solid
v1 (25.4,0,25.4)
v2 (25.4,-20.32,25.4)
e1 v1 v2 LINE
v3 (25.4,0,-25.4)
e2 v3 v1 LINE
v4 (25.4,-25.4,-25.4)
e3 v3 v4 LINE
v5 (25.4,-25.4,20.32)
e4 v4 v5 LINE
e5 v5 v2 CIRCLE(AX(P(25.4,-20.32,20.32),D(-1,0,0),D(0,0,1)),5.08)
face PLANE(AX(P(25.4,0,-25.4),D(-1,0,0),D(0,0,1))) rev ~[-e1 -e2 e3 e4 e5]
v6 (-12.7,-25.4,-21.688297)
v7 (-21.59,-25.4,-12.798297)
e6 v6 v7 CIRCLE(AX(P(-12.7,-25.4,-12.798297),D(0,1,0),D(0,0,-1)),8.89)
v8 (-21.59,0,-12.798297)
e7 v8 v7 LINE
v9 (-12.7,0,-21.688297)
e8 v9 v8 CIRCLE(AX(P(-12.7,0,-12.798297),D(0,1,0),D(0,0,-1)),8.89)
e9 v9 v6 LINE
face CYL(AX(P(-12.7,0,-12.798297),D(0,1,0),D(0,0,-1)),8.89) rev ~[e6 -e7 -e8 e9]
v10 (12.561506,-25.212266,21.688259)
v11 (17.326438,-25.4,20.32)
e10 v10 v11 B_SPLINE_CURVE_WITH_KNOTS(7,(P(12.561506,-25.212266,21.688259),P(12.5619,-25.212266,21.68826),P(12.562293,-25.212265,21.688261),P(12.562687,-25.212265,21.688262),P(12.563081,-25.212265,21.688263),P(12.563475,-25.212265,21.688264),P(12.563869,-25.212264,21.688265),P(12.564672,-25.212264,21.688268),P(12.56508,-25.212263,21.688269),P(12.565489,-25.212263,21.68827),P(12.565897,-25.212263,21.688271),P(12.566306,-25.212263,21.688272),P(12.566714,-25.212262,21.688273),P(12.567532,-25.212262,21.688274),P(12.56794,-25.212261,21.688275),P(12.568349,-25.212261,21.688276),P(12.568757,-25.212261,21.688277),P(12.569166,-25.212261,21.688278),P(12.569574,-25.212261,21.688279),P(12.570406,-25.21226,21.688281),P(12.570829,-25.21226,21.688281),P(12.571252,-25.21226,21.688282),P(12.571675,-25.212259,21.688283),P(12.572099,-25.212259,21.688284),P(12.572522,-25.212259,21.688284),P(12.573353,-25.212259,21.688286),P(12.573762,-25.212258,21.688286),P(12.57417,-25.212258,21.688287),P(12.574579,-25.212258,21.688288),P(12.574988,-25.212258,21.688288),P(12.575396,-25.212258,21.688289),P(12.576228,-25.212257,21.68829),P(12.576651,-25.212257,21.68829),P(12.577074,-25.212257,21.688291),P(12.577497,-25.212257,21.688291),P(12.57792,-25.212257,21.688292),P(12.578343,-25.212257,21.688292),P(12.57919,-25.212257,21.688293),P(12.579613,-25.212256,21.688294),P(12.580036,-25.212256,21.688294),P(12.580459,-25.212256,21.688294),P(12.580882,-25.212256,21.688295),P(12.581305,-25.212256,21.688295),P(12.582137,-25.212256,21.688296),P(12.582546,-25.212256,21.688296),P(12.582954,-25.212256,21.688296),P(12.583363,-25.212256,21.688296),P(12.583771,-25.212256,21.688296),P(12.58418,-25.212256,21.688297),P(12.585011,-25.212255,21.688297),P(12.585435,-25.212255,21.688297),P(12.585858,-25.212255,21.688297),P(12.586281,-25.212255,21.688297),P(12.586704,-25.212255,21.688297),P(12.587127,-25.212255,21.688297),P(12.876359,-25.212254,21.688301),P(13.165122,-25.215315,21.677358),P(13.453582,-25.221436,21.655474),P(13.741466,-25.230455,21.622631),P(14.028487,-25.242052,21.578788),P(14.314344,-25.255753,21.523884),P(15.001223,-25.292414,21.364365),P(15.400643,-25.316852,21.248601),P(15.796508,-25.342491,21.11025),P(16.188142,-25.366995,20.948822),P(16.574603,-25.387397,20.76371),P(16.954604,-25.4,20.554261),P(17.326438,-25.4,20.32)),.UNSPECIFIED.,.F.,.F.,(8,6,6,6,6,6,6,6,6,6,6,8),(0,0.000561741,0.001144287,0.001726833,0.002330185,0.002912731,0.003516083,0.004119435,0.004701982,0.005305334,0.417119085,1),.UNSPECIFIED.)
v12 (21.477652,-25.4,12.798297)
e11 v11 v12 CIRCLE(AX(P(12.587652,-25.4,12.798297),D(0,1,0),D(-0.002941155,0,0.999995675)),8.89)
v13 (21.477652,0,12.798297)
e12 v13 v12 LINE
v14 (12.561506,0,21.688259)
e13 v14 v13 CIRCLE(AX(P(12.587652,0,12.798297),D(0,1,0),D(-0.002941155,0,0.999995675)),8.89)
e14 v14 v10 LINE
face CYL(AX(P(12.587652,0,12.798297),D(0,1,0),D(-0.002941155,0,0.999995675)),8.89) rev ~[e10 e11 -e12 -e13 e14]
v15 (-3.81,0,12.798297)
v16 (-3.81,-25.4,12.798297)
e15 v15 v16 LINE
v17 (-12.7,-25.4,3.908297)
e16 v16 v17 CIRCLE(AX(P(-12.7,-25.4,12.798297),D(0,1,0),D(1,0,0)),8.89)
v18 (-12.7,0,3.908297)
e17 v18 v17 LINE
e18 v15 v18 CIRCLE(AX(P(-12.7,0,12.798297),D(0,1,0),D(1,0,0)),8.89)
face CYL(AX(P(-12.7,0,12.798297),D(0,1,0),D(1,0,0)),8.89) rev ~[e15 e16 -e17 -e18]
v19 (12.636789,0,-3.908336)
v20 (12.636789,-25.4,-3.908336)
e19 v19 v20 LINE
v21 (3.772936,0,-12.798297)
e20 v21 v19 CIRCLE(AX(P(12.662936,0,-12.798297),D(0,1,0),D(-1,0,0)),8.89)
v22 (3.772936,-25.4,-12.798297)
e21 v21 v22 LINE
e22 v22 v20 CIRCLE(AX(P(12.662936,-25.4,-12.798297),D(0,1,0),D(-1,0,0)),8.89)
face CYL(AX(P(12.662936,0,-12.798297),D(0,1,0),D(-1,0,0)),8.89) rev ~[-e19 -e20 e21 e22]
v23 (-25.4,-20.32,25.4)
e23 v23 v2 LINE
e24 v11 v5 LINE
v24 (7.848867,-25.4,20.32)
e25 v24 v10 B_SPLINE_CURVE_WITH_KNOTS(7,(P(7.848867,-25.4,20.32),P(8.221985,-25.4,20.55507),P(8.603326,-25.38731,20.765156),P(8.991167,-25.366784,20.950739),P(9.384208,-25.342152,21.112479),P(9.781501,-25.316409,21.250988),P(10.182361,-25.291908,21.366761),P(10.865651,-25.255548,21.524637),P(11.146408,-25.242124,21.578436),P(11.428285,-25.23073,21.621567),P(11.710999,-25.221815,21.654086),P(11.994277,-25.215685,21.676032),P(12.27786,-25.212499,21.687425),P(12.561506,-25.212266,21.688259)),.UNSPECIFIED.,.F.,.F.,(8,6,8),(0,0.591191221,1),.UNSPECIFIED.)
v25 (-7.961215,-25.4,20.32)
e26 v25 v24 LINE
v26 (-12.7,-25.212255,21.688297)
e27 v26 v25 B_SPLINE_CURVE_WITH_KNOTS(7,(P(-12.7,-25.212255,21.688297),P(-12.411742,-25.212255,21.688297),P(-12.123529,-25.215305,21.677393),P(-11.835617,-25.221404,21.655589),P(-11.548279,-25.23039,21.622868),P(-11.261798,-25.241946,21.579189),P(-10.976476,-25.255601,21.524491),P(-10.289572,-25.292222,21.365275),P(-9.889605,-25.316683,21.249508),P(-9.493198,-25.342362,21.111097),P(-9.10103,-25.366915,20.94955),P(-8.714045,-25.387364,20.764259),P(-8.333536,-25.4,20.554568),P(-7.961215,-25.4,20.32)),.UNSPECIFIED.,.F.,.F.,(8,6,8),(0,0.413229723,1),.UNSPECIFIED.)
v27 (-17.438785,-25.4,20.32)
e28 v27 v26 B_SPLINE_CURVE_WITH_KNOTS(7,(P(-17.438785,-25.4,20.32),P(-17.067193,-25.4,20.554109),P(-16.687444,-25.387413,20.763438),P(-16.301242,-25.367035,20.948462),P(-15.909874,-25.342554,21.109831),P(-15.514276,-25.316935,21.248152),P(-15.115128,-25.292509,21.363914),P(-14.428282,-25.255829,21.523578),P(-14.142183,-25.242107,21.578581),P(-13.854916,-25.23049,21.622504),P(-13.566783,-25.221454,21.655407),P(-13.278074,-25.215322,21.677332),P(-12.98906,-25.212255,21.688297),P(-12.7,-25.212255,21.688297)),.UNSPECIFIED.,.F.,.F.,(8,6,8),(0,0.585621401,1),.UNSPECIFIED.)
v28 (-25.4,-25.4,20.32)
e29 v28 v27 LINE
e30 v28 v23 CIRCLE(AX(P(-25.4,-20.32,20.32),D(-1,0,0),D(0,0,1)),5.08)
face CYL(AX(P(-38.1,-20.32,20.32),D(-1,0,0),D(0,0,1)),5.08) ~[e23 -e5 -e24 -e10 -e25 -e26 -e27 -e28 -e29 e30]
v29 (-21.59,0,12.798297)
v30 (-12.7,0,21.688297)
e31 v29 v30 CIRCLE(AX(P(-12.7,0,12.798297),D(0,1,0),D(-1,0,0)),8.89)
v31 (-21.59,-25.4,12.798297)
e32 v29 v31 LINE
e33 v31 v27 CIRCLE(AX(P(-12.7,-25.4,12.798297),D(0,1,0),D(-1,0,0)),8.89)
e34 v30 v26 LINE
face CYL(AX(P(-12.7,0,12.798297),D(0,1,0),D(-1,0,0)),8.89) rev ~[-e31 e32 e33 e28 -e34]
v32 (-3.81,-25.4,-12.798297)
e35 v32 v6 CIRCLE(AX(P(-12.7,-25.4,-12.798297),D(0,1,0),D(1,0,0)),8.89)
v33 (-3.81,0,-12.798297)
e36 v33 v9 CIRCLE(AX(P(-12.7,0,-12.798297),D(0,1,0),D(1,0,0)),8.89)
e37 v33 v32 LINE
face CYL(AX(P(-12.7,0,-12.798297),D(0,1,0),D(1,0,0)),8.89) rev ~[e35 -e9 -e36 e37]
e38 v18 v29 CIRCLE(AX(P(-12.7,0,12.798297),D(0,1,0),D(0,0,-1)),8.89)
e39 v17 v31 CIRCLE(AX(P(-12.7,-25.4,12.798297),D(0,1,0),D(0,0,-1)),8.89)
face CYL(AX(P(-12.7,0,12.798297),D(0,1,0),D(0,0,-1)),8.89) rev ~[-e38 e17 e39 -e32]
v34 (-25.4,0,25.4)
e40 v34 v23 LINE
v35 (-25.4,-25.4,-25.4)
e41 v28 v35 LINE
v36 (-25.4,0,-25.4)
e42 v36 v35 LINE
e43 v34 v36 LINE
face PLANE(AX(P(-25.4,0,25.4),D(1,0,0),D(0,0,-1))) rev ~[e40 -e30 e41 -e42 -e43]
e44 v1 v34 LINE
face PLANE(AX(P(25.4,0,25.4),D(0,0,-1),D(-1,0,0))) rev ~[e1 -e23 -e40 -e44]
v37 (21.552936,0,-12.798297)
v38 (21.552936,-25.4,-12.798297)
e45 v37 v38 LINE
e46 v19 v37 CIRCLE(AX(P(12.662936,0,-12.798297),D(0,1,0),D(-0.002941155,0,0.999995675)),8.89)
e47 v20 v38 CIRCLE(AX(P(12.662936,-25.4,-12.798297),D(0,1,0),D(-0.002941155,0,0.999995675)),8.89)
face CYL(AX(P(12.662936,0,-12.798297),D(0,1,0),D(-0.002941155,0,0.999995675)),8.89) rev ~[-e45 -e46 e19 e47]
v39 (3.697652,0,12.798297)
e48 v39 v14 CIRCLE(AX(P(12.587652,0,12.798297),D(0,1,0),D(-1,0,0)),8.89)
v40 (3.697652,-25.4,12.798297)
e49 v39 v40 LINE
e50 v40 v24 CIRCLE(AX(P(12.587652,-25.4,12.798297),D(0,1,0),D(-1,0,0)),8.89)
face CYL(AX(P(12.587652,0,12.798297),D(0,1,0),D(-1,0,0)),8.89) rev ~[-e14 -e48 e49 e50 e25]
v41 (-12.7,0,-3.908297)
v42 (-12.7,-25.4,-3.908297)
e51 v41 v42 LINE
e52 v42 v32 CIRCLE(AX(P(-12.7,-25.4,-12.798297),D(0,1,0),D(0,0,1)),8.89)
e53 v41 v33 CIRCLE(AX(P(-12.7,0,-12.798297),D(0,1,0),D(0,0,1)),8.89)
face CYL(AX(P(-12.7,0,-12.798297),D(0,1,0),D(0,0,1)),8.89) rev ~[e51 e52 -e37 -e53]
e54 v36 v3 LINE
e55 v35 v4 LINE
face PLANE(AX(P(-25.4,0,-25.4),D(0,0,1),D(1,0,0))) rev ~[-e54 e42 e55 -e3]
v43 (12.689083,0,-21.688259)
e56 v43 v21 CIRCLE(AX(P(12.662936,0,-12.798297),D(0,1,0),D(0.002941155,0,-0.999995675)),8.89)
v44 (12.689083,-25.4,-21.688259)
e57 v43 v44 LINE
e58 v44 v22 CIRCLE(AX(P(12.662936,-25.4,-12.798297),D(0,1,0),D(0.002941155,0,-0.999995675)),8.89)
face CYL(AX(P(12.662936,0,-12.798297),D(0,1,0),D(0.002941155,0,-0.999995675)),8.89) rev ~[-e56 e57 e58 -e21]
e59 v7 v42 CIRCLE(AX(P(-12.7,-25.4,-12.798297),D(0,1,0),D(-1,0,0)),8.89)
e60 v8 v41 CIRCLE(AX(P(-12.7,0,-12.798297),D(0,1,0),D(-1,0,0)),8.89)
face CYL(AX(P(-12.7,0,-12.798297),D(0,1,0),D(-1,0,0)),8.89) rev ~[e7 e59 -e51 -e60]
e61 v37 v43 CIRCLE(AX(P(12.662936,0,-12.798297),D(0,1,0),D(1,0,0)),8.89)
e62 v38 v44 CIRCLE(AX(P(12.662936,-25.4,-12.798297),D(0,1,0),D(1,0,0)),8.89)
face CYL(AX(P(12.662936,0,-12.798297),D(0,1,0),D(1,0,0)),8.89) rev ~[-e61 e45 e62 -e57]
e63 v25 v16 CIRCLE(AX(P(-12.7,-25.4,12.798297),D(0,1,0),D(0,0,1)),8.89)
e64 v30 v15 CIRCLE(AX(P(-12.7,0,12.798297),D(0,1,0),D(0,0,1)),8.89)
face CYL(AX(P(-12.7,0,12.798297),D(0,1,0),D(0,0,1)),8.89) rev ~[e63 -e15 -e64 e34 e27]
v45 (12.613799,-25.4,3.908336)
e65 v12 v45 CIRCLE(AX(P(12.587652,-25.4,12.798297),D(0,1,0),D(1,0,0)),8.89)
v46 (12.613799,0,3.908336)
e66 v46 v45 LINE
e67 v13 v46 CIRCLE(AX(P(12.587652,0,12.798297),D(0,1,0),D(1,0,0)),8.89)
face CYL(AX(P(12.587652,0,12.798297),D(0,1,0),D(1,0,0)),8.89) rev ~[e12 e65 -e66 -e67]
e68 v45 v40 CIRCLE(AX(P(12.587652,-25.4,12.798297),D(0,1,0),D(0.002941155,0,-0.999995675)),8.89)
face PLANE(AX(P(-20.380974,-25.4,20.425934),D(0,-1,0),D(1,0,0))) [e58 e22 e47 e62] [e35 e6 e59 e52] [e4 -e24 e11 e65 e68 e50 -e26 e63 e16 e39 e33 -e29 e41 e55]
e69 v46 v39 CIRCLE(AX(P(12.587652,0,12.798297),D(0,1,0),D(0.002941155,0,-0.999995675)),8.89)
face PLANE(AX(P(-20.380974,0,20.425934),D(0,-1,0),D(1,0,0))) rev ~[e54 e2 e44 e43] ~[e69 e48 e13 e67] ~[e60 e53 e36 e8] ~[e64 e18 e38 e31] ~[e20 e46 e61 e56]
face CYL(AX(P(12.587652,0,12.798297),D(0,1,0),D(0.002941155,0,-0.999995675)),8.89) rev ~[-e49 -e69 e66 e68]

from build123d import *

# Parameters (mm, degrees)
F1_DEPTH    = 25.4
F2_T1_DEPTH = 76.2


# Not quite as in the source:
# - a fillet or chamfer that OpenCascade refuses, or shapes differently, is made with other operations: its cross-section is extruded or revolved along the edge and cut away or added


with BuildPart() as f1:
    # F0 (on Front) → F1 (new body)
    with BuildSketch(Plane.XZ):
        with BuildLine():
            Line((-12.7, 25.4), (-25.4, 25.4))
            Line((-25.4, 25.4), (-25.4, 12.798297219))
            Line((-25.4, 12.798297219), (-21.59, 12.798297219))
            ThreePointArc((-21.59, 12.798297219), (-18.9861792847, 19.0844765037), (-12.7, 21.688297219))
            Line((-12.7, 21.688297219), (-12.7, 25.4))
        make_face()
        with BuildLine():
            Line((0, 25.4), (-12.7, 25.4))
            Line((-12.7, 25.4), (-12.7, 21.688297219))
            ThreePointArc((-12.7, 21.688297219), (-6.4138207153, 19.0844765037), (-3.81, 12.798297219))
            Line((-3.81, 12.798297219), (0, 12.798297219))
            Line((0, 12.798297219), (0, 25.4))
        make_face()
        with BuildLine():
            Line((-21.59, 12.798297219), (-25.4, 12.798297219))
            Line((-25.4, 12.798297219), (-25.4, 0))
            Line((-25.4, 0), (-12.7, 0))
            Line((-12.7, 0), (-12.7, 3.908297219))
            ThreePointArc((-12.7, 3.908297219), (-18.9861792847, 6.5121179342), (-21.59, 12.798297219))
        make_face()
        with BuildLine():
            Line((12.5505886972, 25.4), (0, 25.4))
            Line((0, 25.4), (0, 12.798297219))
            Line((0, 12.798297219), (3.6976524143, 12.798297219))
            ThreePointArc((3.6976524143, 12.798297219), (6.2922356041, 19.0752253837), (12.5615055494, 21.6882587679))
            Line((12.5615055494, 21.6882587679), (12.5505886972, 25.4))
        make_face()
        with BuildLine():
            Line((-12.7, 0), (-25.4, 0))
            Line((-25.4, 0), (-25.4, -12.798297219))
            Line((-25.4, -12.798297219), (-21.59, -12.798297219))
            ThreePointArc((-21.59, -12.798297219), (-18.9861792847, -6.5121179342), (-12.7, -3.908297219))
            Line((-12.7, -3.908297219), (-12.7, 0))
        make_face()
        with BuildLine():
            Line((25.4, 25.4), (12.5505886972, 25.4))
            Line((12.5505886972, 25.4), (12.5615055494, 21.6882587679))
            ThreePointArc((12.5615055494, 21.6882587679), (18.8645805791, 19.0937140292), (21.4776524143, 12.798297219))
            Line((21.4776524143, 12.798297219), (25.4, 12.798297219))
            Line((25.4, 12.798297219), (25.4, 25.4))
        make_face()
        with BuildLine():
            Line((-21.59, -12.798297219), (-25.4, -12.798297219))
            Line((-25.4, -12.798297219), (-25.4, -25.4))
            Line((-25.4, -25.4), (-12.7, -25.4))
            Line((-12.7, -25.4), (-12.7, -21.688297219))
            ThreePointArc((-12.7, -21.688297219), (-18.9861792847, -19.0844765037), (-21.59, -12.798297219))
        make_face()
        with BuildLine():
            Line((25.4, 0), (25.4, 12.798297219))
            Line((25.4, 12.798297219), (21.4776524143, 12.798297219))
            ThreePointArc((21.4776524143, 12.798297219), (18.8830692245, 6.5213690542), (12.6137992792, 3.90833567))
            Line((12.6137992792, 3.90833567), (12.6252943486, 0))
            Line((12.6252943486, 0), (25.4, 0))
        make_face()
        with BuildLine():
            Line((3.7729362829, -12.798297219), (0, -12.798297219))
            Line((0, -12.798297219), (0, -25.4))
            Line((0, -25.4), (12.7, -25.4))
            Line((12.7, -25.4), (12.6890831478, -21.6882587679))
            ThreePointArc((12.6890831478, -21.6882587679), (6.3860081181, -19.0937140292), (3.7729362829, -12.798297219))
        make_face()
        with BuildLine():
            Line((0, -25.4), (0, -12.798297219))
            Line((0, -12.798297219), (-3.81, -12.798297219))
            ThreePointArc((-3.81, -12.798297219), (-6.4138207153, -19.0844765037), (-12.7, -21.688297219))
            Line((-12.7, -21.688297219), (-12.7, -25.4))
            Line((-12.7, -25.4), (0, -25.4))
        make_face()
        with BuildLine():
            Line((25.4, 0), (12.6252943486, 0))
            Line((12.6252943486, 0), (12.636789418, -3.90833567))
            ThreePointArc((12.636789418, -3.90833567), (18.9398644476, -6.5028804088), (21.5529362829, -12.798297219))
            Line((21.5529362829, -12.798297219), (25.4, -12.798297219))
            Line((25.4, -12.798297219), (25.4, 0))
        make_face()
        with BuildLine():
            Line((25.4, -25.4), (25.4, -12.798297219))
            Line((25.4, -12.798297219), (21.5529362829, -12.798297219))
            ThreePointArc((21.5529362829, -12.798297219), (18.9583530931, -19.0752253837), (12.6890831478, -21.6882587679))
            Line((12.6890831478, -21.6882587679), (12.7, -25.4))
            Line((12.7, -25.4), (25.4, -25.4))
        make_face()
        with BuildLine():
            Line((3.6976524143, 12.798297219), (0, 12.798297219))
            Line((0, 12.798297219), (0, 0))
            Line((0, 0), (12.6252943486, 0))
            Line((12.6252943486, 0), (12.6137992792, 3.90833567))
            ThreePointArc((12.6137992792, 3.90833567), (6.3107242496, 6.5028804088), (3.6976524143, 12.798297219))
        make_face()
        with BuildLine():
            Line((12.6252943486, 0), (0, 0))
            Line((0, 0), (0, -12.798297219))
            Line((0, -12.798297219), (3.7729362829, -12.798297219))
            ThreePointArc((3.7729362829, -12.798297219), (6.3675194726, -6.5213690542), (12.636789418, -3.90833567))
            Line((12.636789418, -3.90833567), (12.6252943486, 0))
        make_face()
        with BuildLine():
            Line((0, 0), (0, 12.798297219))
            Line((0, 12.798297219), (-3.81, 12.798297219))
            ThreePointArc((-3.81, 12.798297219), (-6.4138207153, 6.5121179342), (-12.7, 3.908297219))
            Line((-12.7, 3.908297219), (-12.7, 0))
            Line((-12.7, 0), (0, 0))
        make_face()
        with BuildLine():
            Line((0, 0), (-12.7, 0))
            Line((-12.7, 0), (-12.7, -3.908297219))
            ThreePointArc((-12.7, -3.908297219), (-6.4138207153, -6.5121179342), (-3.81, -12.798297219))
            Line((-3.81, -12.798297219), (0, -12.798297219))
            Line((0, -12.798297219), (0, 0))
        make_face()
    extrude(amount=F1_DEPTH)

    # F2: fillet of radius 5.08 on 1 edges, made by hand

    # F2_s2 → F2_t1 (cut)
    with BuildSketch(Plane.YZ.offset(-38.1)):
        with BuildLine():
            ThreePointArc((-20.32, 25.4), (-23.9121024484, 23.9121024484), (-25.4, 20.32))
            Line((-25.4, 20.32), (-25.4, 25.4))
            Line((-25.4, 25.4), (-20.32, 25.4))
        make_face()
    extrude(amount=F2_T1_DEPTH, mode=Mode.SUBTRACT)


solid = f1.part
